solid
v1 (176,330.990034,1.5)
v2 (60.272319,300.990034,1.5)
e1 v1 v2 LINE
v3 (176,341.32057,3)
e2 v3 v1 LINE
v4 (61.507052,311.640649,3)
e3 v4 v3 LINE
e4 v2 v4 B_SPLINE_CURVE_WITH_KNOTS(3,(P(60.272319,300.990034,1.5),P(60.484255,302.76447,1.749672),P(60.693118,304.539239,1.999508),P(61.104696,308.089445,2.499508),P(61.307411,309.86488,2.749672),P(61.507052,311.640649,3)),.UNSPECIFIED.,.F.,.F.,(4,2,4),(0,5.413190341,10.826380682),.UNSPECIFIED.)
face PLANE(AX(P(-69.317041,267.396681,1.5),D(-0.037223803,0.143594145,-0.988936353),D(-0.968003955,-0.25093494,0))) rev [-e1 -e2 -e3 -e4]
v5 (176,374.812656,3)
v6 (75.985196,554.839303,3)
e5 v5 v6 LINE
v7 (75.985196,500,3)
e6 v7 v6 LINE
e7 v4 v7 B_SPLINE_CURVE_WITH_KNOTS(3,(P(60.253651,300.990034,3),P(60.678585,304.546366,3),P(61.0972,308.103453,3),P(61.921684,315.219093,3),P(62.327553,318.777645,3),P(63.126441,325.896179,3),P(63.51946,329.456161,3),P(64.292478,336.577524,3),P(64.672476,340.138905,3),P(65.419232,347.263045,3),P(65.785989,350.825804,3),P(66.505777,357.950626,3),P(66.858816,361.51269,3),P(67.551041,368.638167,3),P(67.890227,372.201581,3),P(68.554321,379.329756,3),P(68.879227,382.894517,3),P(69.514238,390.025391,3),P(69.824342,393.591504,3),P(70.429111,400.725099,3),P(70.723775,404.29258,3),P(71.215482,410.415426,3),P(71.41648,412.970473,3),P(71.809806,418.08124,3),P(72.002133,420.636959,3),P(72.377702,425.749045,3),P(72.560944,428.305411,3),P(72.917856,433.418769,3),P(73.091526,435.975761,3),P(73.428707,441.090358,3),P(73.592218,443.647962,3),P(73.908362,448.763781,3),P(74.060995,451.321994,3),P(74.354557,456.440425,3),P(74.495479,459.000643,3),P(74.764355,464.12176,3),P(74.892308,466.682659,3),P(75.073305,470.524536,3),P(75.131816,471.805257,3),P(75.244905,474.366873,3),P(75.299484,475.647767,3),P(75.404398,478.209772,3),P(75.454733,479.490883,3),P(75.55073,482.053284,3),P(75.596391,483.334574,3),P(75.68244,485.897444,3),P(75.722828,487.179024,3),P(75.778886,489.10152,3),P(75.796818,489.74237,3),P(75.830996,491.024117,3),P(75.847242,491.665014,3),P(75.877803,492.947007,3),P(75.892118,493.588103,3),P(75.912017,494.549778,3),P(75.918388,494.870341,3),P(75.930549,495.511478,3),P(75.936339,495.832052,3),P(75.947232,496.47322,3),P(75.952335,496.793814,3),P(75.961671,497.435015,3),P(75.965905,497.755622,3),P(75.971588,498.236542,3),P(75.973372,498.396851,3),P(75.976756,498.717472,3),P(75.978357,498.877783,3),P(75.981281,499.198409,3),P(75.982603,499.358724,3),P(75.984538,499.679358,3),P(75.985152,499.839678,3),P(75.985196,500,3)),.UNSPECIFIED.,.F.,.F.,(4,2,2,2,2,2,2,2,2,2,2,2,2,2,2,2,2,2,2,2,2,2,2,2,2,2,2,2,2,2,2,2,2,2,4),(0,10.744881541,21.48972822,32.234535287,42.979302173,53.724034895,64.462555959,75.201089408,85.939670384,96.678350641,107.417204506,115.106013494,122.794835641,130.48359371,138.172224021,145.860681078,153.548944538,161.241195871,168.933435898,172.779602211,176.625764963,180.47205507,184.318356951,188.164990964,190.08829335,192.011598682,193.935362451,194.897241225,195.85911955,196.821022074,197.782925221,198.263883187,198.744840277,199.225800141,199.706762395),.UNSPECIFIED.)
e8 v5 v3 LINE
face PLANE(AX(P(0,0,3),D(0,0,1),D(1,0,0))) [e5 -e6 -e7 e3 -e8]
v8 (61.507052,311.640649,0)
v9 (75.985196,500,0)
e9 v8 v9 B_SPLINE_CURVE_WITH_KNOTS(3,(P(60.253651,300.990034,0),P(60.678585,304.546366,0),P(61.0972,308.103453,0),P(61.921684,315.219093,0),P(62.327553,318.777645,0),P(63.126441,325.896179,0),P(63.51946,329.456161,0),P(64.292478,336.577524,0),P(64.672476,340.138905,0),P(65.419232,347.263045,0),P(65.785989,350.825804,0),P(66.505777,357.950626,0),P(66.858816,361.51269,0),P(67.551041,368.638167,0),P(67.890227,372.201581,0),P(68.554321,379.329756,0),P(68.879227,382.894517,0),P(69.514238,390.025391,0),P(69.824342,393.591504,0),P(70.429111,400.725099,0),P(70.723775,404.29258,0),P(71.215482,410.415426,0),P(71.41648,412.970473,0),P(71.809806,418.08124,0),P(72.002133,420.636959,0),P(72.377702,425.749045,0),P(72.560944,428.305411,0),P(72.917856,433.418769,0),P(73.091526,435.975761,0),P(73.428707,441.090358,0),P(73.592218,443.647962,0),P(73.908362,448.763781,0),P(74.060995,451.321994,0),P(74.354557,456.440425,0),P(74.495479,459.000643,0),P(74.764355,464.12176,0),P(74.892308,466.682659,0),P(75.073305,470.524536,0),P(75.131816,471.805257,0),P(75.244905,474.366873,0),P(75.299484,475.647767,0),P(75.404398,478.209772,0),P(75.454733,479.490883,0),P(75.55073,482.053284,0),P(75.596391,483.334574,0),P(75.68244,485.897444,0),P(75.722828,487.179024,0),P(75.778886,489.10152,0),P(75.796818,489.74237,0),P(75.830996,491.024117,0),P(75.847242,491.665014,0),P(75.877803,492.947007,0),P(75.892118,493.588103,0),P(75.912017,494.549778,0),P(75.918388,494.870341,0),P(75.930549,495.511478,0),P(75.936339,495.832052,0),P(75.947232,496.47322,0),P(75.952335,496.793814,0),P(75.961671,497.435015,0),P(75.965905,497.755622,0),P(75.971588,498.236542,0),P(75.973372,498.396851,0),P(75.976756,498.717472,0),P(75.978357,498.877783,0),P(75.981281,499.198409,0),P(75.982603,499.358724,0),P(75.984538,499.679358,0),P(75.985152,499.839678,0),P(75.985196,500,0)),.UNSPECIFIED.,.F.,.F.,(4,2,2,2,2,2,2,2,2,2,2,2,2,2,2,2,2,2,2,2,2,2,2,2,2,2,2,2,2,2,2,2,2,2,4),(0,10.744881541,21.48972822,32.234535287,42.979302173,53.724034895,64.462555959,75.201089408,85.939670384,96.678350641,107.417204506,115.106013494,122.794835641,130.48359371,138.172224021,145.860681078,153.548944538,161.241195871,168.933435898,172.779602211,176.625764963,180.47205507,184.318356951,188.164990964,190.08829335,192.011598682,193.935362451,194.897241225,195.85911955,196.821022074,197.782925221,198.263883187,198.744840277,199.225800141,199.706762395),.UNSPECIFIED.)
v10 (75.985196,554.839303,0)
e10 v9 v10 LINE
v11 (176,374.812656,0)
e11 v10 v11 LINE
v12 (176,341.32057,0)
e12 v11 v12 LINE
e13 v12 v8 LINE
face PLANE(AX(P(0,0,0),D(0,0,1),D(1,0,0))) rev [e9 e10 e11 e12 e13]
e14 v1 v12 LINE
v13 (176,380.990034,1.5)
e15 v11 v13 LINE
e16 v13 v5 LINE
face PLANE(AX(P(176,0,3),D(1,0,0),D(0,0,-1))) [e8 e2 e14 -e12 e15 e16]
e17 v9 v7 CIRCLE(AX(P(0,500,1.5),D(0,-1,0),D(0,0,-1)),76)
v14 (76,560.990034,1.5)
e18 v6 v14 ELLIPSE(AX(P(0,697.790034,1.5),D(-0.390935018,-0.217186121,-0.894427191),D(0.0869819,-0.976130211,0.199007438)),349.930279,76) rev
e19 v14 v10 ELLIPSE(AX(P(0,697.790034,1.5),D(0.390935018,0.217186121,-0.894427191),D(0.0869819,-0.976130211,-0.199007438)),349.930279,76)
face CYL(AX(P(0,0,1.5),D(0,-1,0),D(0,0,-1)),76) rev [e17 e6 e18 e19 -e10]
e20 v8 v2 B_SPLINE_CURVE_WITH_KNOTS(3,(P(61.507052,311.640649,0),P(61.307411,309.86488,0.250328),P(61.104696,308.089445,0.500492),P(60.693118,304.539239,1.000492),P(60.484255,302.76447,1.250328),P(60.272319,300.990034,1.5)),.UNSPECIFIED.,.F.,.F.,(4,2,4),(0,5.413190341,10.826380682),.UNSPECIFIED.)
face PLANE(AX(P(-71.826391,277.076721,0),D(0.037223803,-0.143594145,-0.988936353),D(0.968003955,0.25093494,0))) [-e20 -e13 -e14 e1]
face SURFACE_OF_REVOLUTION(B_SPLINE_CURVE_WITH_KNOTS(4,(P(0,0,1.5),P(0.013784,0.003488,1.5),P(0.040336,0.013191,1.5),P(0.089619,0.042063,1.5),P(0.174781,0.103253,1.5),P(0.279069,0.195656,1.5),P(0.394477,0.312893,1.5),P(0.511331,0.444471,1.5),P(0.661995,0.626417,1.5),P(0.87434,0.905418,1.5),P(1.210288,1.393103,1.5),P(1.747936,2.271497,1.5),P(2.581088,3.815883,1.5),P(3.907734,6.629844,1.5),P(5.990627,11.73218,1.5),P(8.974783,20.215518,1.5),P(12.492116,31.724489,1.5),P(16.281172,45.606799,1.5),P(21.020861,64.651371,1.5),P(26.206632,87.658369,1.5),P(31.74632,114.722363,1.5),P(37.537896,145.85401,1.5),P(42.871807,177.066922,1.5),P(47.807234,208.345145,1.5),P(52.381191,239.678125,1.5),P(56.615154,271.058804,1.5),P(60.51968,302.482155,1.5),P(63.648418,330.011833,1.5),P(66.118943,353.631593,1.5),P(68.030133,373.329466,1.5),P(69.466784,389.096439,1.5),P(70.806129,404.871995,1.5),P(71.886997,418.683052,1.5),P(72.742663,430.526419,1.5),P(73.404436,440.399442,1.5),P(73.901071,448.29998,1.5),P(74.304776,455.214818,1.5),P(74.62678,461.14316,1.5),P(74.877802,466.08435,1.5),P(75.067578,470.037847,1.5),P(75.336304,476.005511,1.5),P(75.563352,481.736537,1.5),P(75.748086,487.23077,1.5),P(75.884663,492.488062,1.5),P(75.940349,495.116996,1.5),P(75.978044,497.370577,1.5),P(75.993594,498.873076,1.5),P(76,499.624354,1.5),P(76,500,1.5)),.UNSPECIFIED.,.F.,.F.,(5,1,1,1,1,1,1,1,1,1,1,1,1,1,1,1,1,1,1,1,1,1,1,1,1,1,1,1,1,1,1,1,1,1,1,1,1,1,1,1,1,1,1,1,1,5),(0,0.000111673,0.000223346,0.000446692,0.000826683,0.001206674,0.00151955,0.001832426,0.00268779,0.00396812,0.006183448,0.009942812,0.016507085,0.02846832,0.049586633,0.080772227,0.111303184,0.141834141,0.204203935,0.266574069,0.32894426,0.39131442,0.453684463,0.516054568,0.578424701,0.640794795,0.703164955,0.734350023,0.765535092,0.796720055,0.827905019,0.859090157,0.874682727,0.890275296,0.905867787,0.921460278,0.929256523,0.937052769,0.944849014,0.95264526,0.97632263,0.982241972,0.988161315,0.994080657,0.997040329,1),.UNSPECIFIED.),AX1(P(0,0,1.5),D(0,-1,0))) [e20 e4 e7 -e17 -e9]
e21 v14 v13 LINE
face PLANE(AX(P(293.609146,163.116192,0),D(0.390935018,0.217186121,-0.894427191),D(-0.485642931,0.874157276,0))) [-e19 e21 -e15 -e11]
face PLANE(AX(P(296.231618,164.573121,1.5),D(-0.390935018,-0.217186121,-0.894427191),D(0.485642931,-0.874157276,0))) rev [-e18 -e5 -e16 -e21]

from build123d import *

# Parameters (mm, degrees)
BOSS_EXTRUDE1_DEPTH = 3
CHAMFER6_SIZE       = 1.5
CHAMFER6_SIZE_2     = 3
CHAMFER7_SIZE       = 1.5
CHAMFER7_SIZE_2     = 3
CHAMFER8_SIZE       = 10
CHAMFER8_SIZE_2     = 1.5
CHAMFER9_SIZE       = 10
CHAMFER9_SIZE_2     = 1.5


with BuildPart() as part:
    # Sketch1 → Boss-Extrude1 (new body)
    with BuildSketch(Plane.XY):
        Polygon((76, 560.990034), (176, 380.990034), (176, 330.990034), (60.272319057, 300.990034), (0, 300.990034), (0, 560.990034), align=None)
    extrude(amount=BOSS_EXTRUDE1_DEPTH)

    # Sketch2 → Cut-Revolve1 (revolve, cut)
    with BuildSketch(Plane.XY.offset(1.5)):
        with BuildLine():
            Line((76, 500), (76, 585.578863385))
            Line((76, 585.578863385), (0, 585.578863385))
            Line((0, 585.578863385), (0, 0))
            add(Edge.make_bspline(
                [(0, 0), (0.013783816, 0.003488157), (0.04033603, 0.01319051), (0.089619378, 0.042063455), (0.174781236, 0.103253354), (0.279068591, 0.195655925), (0.394476748, 0.312893359), (0.511330855, 0.444471001), (0.661995475, 0.626416713), (0.874340043, 0.905417524), (1.210288344, 1.39310301), (1.747935993, 2.271497179), (2.58108843, 3.81588258), (3.907734136, 6.629844229), (5.990626535, 11.732179856), (8.974782838, 20.21551767), (12.492116493, 31.724489027), (16.281172086, 45.606799288), (21.020860811, 64.651371321), (26.206631662, 87.658368898), (31.746320492, 114.722363422), (37.537896498, 145.854010301), (42.871807206, 177.066921726), (47.80723428, 208.345145014), (52.381191067, 239.678124678), (56.615153522, 271.058803785), (60.519680025, 302.482154914), (63.648418258, 330.011833268), (66.11894295, 353.631593101), (68.030132581, 373.329466343), (69.466784443, 389.09643856), (70.806129018, 404.87199461), (71.886996993, 418.683052253), (72.742662769, 430.526418849), (73.404435972, 440.399441684), (73.901071328, 448.299980017), (74.304775576, 455.214817724), (74.62677953, 461.143160456), (74.877801518, 466.084350078), (75.067577987, 470.037846817), (75.336303636, 476.005510657), (75.563352259, 481.736537174), (75.748085722, 487.230769759), (75.884662604, 492.488061525), (75.940348523, 495.116996281), (75.978043797, 497.370577281), (75.993594118, 498.87307617), (76, 499.624354134), (76, 500)],
                knots=[0, 0, 0, 0, 0, 0.000111673, 0.000223346, 0.000446692, 0.000826683, 0.001206674, 0.00151955, 0.001832426, 0.00268779, 0.00396812, 0.006183448, 0.009942812, 0.016507085, 0.02846832, 0.049586633, 0.080772227, 0.111303184, 0.141834141, 0.204203935, 0.266574069, 0.32894426, 0.39131442, 0.453684463, 0.516054568, 0.578424701, 0.640794795, 0.703164955, 0.734350023, 0.765535092, 0.796720055, 0.827905019, 0.859090157, 0.874682727, 0.890275296, 0.905867787, 0.921460278, 0.929256523, 0.937052769, 0.944849014, 0.95264526, 0.97632263, 0.982241972, 0.988161315, 0.994080657, 0.997040329, 1, 1, 1, 1, 1], degree=4))
        make_face()
    revolve(axis=Axis((0, 0, 1.5), (0, 1, 0)), mode=Mode.SUBTRACT)

    # Chamfer6
    # the kernel refuses this chamfer: 3, 1.5 mm, written as the material it takes off along each edge
    with BuildSketch(Plane(origin=(72.226803743, 567.781787262, 3), x_dir=(0.060245471517658, 0.03346970639869887, -0.9976223042390342), z_dir=(0.4856429311786319, -0.8741572761215379, 0))) as chamfer6_piece_1:
        Polygon((CHAMFER6_SIZE * 0.997622304239, -CHAMFER6_SIZE * 0.0689183436017), (-CHAMFER6_SIZE_2 * 0.0689183436017, -CHAMFER6_SIZE_2 * 0.997622304239), (0, 0), align=None)
    extrude(amount=221.451576062, mode=Mode.SUBTRACT)

    # Chamfer7
    # the kernel refuses this chamfer: 3, 1.5 mm, written as the material it takes off along each edge
    with BuildSketch(Plane(origin=(72.226803743, 567.781787262, 0), x_dir=(0.060245471517658, 0.03346970639869887, 0.9976223042390342), z_dir=(0.4856429311786319, -0.8741572761215379, 0))) as chamfer7_piece_1:
        Polygon((CHAMFER7_SIZE * 0.997622304239, CHAMFER7_SIZE * 0.0689183436017), (-CHAMFER7_SIZE_2 * 0.0689183436017, CHAMFER7_SIZE_2 * 0.997622304239), (0, 0), align=None)
    extrude(amount=221.451576062, mode=Mode.SUBTRACT)

    # Chamfer8
    # the kernel refuses this chamfer: 10, 1.5 mm, written as the material it takes off along each edge
    with BuildSketch(Plane(origin=(201.157802967, 337.511672409, 3), x_dir=(-0.250930852134312, 0.9679881864854557, 0.005707737883485932), z_dir=(-0.9680039545618228, -0.2509349396809314, 0))) as chamfer8_piece_1:
        Polygon((CHAMFER8_SIZE * 0.999983710731, CHAMFER8_SIZE * 0.00570773788349), (-CHAMFER8_SIZE_2 * 0.00570773788349, CHAMFER8_SIZE_2 * 0.999983710731), (0, 0), align=None)
    extrude(amount=171.531620397, mode=Mode.SUBTRACT)

    # Chamfer9
    # the kernel refuses this chamfer: 10, 1.5 mm, written as the material it takes off along each edge
    with BuildSketch(Plane(origin=(201.157802967, 337.511672409, 0), x_dir=(-0.250930852134312, 0.9679881864854557, -0.005707737883485934), z_dir=(-0.9680039545618228, -0.2509349396809314, 0))) as chamfer9_piece_1:
        Polygon((CHAMFER9_SIZE * 0.999983710731, -CHAMFER9_SIZE * 0.00570773788349), (-CHAMFER9_SIZE_2 * 0.00570773788349, -CHAMFER9_SIZE_2 * 0.999983710731), (0, 0), align=None)
    extrude(amount=171.531620397, mode=Mode.SUBTRACT)


solid = part.part
